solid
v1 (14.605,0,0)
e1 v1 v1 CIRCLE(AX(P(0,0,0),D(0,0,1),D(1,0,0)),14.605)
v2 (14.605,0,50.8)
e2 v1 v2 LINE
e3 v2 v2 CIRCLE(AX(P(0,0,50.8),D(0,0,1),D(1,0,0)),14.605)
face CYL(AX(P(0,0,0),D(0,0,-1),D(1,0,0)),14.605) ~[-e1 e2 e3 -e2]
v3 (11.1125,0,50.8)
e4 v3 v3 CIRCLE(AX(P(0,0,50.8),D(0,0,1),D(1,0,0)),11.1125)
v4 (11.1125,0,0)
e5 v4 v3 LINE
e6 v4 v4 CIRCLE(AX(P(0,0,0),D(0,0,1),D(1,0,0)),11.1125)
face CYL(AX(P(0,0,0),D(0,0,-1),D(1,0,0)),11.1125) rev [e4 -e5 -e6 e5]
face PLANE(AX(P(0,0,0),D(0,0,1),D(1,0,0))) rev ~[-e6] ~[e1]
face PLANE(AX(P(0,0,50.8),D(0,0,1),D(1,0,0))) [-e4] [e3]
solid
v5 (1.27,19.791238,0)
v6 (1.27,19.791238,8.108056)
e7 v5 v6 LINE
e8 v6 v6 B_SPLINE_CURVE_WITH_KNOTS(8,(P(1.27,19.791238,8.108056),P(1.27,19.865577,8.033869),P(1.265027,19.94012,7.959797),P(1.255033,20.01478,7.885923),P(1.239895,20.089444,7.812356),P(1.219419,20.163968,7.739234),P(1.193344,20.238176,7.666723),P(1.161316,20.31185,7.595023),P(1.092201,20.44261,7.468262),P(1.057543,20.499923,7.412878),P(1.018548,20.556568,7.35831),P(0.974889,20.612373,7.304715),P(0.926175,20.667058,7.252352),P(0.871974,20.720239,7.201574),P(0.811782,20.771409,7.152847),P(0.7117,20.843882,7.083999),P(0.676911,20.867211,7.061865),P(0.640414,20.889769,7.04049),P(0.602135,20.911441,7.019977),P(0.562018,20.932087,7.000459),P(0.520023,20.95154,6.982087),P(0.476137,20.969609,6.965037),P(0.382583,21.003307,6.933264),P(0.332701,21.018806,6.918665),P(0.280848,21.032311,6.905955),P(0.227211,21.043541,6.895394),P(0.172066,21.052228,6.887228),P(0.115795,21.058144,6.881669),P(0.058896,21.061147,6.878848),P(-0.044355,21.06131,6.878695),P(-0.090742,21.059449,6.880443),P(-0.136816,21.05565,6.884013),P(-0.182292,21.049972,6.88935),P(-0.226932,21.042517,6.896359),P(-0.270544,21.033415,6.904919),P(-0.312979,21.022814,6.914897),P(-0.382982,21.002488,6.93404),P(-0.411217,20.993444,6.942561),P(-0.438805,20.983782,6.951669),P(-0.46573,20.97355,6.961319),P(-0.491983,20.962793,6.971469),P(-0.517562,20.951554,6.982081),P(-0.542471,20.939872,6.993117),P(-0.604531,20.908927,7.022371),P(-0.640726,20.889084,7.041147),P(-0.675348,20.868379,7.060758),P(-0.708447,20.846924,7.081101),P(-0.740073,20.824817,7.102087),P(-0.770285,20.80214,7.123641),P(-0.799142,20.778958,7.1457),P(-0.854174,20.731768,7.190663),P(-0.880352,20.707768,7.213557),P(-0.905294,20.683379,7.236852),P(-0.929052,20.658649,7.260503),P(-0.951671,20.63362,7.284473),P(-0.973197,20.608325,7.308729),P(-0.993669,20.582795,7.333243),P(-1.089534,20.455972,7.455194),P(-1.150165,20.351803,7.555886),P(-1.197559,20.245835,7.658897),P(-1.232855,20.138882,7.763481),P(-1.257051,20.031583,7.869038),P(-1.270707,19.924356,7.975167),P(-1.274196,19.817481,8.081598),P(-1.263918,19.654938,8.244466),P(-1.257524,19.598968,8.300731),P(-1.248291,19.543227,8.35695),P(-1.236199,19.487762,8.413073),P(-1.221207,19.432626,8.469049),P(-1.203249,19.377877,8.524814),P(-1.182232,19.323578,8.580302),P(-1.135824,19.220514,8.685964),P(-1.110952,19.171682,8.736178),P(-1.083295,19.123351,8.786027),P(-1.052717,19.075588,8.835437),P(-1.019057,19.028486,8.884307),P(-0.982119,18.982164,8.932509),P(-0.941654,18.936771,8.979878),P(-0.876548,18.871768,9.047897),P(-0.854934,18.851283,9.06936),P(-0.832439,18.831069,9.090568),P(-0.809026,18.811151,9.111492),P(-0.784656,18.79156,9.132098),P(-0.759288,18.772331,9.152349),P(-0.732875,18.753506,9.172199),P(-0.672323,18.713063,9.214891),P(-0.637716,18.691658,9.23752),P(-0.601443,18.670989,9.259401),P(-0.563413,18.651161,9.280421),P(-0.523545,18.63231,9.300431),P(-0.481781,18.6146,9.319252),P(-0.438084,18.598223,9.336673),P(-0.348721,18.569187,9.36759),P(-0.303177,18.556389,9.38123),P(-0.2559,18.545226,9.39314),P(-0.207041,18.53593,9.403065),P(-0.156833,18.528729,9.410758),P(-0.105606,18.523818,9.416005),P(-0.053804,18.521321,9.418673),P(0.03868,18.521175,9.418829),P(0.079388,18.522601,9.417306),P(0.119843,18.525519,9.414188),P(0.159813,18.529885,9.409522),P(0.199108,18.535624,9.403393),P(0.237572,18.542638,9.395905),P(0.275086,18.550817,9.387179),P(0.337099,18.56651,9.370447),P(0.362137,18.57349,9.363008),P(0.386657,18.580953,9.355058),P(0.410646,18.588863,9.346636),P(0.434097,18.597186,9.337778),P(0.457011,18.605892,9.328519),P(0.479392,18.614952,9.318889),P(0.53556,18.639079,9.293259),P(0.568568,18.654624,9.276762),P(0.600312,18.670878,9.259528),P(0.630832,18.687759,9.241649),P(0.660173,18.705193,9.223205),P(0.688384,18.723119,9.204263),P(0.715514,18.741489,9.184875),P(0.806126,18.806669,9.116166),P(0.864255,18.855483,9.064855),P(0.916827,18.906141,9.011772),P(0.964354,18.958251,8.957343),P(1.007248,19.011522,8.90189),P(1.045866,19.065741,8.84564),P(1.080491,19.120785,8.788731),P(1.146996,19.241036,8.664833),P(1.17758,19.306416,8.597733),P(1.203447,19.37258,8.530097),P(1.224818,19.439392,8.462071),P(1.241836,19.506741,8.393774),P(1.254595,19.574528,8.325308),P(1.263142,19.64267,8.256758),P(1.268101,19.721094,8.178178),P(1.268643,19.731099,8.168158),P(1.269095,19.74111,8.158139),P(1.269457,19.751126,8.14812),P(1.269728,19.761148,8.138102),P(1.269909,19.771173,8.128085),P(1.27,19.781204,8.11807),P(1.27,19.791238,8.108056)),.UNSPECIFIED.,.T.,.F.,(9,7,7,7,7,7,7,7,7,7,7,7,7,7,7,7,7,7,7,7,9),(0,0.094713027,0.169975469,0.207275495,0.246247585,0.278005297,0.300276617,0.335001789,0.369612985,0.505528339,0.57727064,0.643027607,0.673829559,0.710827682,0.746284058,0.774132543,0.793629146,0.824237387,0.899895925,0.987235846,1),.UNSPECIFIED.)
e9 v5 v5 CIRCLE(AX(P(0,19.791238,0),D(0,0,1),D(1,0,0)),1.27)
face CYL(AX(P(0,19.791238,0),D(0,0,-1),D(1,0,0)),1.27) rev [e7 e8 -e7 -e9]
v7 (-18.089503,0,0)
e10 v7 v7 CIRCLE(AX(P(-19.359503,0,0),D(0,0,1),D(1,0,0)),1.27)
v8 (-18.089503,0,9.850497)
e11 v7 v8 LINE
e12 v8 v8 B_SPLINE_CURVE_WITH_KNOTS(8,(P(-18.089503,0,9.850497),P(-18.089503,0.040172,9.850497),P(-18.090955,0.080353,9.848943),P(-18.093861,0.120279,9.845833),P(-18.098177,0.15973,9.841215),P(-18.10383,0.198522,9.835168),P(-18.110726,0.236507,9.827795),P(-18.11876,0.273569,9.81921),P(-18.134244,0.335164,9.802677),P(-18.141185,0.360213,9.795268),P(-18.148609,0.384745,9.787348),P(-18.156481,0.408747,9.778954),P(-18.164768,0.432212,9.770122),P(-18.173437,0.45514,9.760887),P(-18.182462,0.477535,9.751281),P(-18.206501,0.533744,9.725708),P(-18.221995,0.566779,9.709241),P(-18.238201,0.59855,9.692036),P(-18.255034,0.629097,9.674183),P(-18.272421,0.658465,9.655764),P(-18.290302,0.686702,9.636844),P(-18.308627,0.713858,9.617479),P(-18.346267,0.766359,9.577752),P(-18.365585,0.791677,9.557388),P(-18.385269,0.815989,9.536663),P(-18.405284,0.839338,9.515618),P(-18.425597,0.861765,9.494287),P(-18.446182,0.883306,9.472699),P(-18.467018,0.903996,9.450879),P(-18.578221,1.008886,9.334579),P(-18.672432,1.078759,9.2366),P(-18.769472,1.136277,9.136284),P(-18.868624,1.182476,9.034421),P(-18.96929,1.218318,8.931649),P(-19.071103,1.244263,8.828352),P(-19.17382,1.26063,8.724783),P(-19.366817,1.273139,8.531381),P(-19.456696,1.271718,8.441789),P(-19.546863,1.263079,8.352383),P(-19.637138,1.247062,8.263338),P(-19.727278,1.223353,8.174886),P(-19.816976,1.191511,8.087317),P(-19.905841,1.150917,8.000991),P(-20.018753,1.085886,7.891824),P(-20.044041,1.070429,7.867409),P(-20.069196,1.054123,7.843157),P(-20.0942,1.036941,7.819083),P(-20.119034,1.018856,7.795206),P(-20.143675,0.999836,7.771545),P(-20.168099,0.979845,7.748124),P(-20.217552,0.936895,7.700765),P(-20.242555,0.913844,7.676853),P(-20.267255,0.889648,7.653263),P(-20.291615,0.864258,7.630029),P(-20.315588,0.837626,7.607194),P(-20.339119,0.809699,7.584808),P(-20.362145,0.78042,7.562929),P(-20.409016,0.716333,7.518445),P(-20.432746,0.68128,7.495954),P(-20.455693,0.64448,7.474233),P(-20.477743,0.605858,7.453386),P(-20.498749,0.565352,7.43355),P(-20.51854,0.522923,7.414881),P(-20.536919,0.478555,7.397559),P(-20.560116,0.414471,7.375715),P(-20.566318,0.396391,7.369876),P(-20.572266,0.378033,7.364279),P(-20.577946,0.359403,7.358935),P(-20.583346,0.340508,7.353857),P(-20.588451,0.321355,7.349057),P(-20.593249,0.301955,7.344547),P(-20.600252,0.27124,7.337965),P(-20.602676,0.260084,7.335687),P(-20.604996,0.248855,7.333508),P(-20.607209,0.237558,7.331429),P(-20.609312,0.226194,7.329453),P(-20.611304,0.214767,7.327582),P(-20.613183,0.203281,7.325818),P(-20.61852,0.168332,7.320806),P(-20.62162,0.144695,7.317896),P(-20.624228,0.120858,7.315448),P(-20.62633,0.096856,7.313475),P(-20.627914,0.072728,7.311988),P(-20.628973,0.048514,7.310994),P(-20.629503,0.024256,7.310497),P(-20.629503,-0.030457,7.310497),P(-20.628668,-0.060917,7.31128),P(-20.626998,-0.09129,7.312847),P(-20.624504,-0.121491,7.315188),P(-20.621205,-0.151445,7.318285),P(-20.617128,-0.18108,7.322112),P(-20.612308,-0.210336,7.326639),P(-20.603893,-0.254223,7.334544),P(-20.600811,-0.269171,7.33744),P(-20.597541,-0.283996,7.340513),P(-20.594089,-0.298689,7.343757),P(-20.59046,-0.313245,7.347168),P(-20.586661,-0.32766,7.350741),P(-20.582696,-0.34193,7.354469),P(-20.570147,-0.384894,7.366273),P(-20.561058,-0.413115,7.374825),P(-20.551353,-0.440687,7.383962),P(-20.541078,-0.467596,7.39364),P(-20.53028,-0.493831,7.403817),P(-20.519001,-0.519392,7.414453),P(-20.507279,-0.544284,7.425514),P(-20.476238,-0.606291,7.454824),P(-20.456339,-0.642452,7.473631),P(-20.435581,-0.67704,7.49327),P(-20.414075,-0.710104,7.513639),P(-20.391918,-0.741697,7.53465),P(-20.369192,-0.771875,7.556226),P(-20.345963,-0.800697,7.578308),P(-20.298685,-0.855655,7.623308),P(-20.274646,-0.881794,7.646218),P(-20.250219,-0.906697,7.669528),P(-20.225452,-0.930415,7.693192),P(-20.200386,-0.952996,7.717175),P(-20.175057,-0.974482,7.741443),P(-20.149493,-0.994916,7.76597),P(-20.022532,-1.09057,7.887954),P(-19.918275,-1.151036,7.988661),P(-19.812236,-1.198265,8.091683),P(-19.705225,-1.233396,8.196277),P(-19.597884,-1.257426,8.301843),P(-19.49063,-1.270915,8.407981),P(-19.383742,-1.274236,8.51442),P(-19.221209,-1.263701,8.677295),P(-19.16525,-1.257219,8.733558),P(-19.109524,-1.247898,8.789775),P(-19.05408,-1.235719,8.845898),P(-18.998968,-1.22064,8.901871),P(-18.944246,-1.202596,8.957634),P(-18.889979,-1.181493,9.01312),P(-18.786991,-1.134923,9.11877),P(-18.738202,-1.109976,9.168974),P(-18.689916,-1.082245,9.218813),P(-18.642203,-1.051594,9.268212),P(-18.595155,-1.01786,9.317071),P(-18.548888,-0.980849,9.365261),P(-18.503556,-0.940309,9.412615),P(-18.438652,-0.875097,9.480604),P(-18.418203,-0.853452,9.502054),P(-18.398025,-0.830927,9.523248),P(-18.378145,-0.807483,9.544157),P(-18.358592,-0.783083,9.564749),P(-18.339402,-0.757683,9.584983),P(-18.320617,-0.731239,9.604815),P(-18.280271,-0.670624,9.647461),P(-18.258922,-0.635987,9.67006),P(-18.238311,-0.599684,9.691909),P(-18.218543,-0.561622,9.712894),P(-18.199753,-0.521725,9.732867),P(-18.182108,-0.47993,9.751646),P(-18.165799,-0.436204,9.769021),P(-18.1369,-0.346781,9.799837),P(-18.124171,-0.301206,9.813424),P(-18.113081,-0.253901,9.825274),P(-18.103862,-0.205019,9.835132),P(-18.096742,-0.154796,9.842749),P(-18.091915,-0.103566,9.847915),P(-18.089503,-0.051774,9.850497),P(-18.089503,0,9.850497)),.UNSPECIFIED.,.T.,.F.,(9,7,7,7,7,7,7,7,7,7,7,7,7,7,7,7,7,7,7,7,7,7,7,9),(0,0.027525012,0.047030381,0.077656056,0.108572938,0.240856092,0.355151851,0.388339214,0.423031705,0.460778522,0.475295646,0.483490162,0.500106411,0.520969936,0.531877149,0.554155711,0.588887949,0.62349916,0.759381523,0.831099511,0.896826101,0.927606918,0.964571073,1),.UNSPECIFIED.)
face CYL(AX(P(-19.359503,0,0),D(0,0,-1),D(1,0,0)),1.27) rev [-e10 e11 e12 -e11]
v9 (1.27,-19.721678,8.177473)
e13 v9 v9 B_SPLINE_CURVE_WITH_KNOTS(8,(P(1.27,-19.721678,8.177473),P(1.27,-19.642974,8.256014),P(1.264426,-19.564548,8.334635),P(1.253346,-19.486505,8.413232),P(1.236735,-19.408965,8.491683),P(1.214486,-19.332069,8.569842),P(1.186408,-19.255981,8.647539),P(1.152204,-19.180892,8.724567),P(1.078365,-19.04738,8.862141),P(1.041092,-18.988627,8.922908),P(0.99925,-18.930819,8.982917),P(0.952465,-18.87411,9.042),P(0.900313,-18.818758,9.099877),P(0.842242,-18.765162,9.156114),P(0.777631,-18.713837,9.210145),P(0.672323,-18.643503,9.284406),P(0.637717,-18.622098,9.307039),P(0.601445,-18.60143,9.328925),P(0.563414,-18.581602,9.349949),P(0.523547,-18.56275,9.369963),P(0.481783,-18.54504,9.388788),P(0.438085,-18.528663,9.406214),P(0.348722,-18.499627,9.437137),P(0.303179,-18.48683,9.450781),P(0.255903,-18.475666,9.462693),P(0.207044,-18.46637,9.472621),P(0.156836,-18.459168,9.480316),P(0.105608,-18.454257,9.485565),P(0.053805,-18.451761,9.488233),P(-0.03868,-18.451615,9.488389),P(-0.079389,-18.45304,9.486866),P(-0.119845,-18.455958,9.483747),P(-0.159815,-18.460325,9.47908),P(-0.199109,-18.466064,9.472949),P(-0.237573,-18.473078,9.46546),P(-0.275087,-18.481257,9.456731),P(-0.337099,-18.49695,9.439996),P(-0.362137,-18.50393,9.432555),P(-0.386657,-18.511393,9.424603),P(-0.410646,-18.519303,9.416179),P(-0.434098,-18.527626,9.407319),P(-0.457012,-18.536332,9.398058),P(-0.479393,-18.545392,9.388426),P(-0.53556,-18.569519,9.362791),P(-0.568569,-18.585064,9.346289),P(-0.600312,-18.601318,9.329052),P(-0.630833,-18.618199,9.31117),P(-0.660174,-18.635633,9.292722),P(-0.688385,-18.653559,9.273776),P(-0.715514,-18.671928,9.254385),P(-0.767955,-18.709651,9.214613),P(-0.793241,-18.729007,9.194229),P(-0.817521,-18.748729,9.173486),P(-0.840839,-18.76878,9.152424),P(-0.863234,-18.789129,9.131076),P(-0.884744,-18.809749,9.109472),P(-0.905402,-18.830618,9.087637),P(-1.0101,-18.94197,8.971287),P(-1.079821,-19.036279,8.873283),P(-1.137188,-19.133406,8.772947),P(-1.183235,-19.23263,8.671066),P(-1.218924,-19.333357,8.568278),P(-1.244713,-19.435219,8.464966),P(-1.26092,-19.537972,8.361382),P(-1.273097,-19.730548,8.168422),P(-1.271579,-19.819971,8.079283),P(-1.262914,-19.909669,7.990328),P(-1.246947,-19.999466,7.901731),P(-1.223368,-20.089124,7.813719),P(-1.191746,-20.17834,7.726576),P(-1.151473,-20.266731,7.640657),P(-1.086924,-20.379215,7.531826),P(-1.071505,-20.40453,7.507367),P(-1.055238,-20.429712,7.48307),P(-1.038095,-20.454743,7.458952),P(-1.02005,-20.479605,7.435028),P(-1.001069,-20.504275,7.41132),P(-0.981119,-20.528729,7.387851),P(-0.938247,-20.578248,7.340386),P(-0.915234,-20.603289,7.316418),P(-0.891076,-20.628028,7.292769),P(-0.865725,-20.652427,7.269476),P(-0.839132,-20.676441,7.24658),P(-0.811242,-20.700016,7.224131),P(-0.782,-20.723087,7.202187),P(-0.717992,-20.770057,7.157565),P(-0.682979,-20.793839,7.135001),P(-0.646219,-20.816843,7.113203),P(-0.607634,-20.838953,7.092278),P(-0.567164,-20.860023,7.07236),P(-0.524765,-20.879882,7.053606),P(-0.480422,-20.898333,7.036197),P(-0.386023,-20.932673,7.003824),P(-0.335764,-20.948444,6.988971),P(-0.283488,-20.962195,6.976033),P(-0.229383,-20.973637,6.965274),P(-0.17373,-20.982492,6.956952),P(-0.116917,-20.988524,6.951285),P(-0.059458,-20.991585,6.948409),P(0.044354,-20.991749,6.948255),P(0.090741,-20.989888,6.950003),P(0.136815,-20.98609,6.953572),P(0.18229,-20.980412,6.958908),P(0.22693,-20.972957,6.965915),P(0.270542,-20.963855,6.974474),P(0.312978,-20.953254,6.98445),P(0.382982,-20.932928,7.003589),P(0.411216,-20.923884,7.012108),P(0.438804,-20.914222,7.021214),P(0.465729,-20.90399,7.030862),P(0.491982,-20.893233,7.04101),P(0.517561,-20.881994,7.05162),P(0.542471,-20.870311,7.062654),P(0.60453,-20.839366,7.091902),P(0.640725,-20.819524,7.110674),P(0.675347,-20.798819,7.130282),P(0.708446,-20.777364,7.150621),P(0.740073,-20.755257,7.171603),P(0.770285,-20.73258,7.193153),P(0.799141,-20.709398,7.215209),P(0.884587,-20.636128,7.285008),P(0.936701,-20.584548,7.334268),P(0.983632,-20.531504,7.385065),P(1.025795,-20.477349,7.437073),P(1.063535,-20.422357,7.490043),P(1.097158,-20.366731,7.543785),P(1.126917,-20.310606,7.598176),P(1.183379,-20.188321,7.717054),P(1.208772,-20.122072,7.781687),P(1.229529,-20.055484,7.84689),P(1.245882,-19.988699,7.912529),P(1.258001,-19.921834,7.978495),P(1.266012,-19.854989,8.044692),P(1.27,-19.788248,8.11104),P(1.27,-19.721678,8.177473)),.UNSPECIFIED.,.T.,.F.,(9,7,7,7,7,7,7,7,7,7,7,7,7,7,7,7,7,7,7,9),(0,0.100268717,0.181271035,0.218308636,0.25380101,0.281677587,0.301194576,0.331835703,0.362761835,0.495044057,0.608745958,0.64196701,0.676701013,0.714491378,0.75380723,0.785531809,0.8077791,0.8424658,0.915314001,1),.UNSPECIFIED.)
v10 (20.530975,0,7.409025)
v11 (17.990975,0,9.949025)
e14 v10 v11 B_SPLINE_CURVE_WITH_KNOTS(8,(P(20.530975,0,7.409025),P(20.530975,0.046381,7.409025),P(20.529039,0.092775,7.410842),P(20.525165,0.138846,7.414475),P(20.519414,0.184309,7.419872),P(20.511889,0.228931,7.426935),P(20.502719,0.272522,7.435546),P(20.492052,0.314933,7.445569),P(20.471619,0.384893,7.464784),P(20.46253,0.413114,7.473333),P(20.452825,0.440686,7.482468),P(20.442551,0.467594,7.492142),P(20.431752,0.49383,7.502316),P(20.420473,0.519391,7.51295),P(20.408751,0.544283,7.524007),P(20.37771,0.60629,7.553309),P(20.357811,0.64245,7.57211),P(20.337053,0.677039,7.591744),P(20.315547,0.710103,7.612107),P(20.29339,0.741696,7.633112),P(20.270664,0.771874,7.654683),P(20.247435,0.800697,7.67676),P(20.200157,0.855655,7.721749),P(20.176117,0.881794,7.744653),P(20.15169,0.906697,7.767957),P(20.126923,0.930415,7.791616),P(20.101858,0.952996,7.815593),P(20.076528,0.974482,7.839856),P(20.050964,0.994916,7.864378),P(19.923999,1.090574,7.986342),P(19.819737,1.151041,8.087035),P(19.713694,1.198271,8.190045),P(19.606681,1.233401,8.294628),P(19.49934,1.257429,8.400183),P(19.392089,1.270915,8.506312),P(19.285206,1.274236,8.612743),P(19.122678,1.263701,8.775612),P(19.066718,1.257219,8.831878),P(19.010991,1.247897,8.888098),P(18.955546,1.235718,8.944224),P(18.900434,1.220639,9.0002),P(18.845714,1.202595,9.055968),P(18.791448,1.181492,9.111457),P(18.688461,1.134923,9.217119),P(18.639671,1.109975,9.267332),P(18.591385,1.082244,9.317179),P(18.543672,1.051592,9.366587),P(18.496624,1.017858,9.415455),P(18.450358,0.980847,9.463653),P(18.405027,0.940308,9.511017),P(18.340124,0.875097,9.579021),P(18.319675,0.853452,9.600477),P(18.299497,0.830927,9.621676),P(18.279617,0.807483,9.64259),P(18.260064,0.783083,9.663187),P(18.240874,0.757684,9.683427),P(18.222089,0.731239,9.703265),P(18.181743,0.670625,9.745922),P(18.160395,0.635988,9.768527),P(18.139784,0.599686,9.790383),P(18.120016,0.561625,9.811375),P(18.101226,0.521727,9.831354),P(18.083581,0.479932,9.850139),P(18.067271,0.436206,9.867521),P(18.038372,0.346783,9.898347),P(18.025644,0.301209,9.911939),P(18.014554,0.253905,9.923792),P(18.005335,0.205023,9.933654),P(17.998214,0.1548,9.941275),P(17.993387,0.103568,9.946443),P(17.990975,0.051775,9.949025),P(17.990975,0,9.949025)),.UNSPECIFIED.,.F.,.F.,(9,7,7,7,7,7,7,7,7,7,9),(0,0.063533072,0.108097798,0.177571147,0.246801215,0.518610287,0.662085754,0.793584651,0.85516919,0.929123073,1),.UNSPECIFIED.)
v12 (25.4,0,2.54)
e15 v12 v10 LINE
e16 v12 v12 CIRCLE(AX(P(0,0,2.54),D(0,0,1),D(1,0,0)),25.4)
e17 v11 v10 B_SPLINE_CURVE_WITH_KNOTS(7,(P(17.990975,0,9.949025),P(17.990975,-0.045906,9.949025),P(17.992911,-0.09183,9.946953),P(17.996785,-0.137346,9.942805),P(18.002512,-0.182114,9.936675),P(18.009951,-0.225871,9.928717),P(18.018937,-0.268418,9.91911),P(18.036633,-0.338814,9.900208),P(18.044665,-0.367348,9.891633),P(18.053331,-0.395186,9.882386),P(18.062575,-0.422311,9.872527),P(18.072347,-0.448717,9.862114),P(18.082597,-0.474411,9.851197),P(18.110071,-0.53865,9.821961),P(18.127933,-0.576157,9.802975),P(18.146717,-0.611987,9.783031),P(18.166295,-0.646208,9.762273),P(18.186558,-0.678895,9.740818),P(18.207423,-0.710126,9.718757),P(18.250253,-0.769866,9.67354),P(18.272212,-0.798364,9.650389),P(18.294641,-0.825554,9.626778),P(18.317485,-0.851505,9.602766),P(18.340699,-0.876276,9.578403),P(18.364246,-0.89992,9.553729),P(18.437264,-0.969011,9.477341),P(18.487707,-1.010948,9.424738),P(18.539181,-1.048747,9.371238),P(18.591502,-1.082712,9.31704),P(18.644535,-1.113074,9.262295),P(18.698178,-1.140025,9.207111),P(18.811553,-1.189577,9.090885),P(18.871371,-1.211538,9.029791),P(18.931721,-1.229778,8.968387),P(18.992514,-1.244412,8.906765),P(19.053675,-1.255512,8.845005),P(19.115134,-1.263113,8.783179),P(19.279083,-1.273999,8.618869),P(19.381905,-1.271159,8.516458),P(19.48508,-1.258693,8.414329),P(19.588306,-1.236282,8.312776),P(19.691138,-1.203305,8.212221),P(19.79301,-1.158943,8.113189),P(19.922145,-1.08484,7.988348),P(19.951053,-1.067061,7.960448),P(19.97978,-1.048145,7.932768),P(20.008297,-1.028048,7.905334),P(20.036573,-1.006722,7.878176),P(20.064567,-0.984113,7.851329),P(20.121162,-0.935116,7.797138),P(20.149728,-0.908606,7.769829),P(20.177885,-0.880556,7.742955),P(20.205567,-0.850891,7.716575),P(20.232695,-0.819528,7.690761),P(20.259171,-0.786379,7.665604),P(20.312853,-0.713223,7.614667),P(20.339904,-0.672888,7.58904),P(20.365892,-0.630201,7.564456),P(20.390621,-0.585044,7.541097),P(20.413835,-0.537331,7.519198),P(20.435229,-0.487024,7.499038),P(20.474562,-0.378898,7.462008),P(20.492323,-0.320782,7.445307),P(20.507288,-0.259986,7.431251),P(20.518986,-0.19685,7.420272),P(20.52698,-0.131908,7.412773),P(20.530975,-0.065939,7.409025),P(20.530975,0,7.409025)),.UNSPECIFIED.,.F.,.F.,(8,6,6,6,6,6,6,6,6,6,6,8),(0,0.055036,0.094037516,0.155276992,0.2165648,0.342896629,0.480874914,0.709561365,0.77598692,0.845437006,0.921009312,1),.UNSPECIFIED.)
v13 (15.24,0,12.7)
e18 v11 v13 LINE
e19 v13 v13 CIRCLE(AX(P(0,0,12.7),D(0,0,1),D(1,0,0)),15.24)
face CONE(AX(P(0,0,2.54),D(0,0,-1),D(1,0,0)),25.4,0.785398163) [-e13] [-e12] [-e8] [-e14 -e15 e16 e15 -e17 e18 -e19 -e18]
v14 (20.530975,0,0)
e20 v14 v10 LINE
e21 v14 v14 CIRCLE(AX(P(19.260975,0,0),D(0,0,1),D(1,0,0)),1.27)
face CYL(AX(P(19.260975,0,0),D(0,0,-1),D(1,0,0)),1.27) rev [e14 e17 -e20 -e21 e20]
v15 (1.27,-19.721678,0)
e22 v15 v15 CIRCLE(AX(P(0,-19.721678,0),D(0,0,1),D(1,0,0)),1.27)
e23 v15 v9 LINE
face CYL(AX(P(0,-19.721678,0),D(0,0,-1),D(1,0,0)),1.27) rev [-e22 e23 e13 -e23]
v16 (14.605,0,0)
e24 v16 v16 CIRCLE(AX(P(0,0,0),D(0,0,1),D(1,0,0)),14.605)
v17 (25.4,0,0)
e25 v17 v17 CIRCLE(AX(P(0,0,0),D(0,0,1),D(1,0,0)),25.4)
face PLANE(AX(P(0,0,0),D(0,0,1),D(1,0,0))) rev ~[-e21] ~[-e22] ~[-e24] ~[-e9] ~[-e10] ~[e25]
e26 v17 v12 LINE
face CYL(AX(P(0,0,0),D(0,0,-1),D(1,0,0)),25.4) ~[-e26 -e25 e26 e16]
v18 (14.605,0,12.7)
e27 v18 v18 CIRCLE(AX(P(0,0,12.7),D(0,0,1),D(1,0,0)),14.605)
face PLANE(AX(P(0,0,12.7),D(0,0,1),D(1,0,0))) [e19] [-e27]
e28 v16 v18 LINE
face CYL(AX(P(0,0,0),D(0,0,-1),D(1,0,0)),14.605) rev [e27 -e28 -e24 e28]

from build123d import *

# Parameters (mm, degrees)
F0_R     = 25.4
F0_R_2   = 1.27
F0_R_3   = 14.605
F1_DEPTH = 12.7
F0_R_4   = 11.1125
F2_DEPTH = 50.8


# Not quite as in the source:
# - a fillet or chamfer that OpenCascade refuses, or shapes differently, is made with other operations: its cross-section is extruded or revolved along the edge and cut away or added
# - a feature of the source that left no trace in its solid (it failed there, or was rolled back) is left out


with BuildPart() as f1:
    # F0 (on Top) → F1 (new body)
    with BuildSketch(Plane.XY):
        Circle(F0_R)
        with Locations((0, -19.7216775268)):
            Circle(F0_R_2, mode=Mode.SUBTRACT)
        with Locations((-19.3595029414, 0)):
            Circle(F0_R_2, mode=Mode.SUBTRACT)
        Circle(F0_R_3, mode=Mode.SUBTRACT)
        with Locations((19.2609746009, 0)):
            Circle(F0_R_2, mode=Mode.SUBTRACT)
        with Locations((0, 19.7912380099)):
            Circle(F0_R_2, mode=Mode.SUBTRACT)
    extrude(amount=F1_DEPTH)

    # F3: chamfer of 10.16 on 1 edges, made by hand

    # F3_s1 → F3_t2 (revolve, cut)
    with BuildSketch(Plane.XZ):
        Polygon((25.4, 2.54), (15.24, 12.7), (25.4, 12.7), align=None)
    revolve(axis=Axis((0, 0, 12.7), (0, 0, 1)), mode=Mode.SUBTRACT)


with BuildPart() as f2:
    # F0 (on Top) → F2 (new body)
    with BuildSketch(Plane.XY):
        Circle(F0_R_3)
        Circle(F0_R_4, mode=Mode.SUBTRACT)
    extrude(amount=F2_DEPTH)


solid = Compound([f1.part, f2.part])
